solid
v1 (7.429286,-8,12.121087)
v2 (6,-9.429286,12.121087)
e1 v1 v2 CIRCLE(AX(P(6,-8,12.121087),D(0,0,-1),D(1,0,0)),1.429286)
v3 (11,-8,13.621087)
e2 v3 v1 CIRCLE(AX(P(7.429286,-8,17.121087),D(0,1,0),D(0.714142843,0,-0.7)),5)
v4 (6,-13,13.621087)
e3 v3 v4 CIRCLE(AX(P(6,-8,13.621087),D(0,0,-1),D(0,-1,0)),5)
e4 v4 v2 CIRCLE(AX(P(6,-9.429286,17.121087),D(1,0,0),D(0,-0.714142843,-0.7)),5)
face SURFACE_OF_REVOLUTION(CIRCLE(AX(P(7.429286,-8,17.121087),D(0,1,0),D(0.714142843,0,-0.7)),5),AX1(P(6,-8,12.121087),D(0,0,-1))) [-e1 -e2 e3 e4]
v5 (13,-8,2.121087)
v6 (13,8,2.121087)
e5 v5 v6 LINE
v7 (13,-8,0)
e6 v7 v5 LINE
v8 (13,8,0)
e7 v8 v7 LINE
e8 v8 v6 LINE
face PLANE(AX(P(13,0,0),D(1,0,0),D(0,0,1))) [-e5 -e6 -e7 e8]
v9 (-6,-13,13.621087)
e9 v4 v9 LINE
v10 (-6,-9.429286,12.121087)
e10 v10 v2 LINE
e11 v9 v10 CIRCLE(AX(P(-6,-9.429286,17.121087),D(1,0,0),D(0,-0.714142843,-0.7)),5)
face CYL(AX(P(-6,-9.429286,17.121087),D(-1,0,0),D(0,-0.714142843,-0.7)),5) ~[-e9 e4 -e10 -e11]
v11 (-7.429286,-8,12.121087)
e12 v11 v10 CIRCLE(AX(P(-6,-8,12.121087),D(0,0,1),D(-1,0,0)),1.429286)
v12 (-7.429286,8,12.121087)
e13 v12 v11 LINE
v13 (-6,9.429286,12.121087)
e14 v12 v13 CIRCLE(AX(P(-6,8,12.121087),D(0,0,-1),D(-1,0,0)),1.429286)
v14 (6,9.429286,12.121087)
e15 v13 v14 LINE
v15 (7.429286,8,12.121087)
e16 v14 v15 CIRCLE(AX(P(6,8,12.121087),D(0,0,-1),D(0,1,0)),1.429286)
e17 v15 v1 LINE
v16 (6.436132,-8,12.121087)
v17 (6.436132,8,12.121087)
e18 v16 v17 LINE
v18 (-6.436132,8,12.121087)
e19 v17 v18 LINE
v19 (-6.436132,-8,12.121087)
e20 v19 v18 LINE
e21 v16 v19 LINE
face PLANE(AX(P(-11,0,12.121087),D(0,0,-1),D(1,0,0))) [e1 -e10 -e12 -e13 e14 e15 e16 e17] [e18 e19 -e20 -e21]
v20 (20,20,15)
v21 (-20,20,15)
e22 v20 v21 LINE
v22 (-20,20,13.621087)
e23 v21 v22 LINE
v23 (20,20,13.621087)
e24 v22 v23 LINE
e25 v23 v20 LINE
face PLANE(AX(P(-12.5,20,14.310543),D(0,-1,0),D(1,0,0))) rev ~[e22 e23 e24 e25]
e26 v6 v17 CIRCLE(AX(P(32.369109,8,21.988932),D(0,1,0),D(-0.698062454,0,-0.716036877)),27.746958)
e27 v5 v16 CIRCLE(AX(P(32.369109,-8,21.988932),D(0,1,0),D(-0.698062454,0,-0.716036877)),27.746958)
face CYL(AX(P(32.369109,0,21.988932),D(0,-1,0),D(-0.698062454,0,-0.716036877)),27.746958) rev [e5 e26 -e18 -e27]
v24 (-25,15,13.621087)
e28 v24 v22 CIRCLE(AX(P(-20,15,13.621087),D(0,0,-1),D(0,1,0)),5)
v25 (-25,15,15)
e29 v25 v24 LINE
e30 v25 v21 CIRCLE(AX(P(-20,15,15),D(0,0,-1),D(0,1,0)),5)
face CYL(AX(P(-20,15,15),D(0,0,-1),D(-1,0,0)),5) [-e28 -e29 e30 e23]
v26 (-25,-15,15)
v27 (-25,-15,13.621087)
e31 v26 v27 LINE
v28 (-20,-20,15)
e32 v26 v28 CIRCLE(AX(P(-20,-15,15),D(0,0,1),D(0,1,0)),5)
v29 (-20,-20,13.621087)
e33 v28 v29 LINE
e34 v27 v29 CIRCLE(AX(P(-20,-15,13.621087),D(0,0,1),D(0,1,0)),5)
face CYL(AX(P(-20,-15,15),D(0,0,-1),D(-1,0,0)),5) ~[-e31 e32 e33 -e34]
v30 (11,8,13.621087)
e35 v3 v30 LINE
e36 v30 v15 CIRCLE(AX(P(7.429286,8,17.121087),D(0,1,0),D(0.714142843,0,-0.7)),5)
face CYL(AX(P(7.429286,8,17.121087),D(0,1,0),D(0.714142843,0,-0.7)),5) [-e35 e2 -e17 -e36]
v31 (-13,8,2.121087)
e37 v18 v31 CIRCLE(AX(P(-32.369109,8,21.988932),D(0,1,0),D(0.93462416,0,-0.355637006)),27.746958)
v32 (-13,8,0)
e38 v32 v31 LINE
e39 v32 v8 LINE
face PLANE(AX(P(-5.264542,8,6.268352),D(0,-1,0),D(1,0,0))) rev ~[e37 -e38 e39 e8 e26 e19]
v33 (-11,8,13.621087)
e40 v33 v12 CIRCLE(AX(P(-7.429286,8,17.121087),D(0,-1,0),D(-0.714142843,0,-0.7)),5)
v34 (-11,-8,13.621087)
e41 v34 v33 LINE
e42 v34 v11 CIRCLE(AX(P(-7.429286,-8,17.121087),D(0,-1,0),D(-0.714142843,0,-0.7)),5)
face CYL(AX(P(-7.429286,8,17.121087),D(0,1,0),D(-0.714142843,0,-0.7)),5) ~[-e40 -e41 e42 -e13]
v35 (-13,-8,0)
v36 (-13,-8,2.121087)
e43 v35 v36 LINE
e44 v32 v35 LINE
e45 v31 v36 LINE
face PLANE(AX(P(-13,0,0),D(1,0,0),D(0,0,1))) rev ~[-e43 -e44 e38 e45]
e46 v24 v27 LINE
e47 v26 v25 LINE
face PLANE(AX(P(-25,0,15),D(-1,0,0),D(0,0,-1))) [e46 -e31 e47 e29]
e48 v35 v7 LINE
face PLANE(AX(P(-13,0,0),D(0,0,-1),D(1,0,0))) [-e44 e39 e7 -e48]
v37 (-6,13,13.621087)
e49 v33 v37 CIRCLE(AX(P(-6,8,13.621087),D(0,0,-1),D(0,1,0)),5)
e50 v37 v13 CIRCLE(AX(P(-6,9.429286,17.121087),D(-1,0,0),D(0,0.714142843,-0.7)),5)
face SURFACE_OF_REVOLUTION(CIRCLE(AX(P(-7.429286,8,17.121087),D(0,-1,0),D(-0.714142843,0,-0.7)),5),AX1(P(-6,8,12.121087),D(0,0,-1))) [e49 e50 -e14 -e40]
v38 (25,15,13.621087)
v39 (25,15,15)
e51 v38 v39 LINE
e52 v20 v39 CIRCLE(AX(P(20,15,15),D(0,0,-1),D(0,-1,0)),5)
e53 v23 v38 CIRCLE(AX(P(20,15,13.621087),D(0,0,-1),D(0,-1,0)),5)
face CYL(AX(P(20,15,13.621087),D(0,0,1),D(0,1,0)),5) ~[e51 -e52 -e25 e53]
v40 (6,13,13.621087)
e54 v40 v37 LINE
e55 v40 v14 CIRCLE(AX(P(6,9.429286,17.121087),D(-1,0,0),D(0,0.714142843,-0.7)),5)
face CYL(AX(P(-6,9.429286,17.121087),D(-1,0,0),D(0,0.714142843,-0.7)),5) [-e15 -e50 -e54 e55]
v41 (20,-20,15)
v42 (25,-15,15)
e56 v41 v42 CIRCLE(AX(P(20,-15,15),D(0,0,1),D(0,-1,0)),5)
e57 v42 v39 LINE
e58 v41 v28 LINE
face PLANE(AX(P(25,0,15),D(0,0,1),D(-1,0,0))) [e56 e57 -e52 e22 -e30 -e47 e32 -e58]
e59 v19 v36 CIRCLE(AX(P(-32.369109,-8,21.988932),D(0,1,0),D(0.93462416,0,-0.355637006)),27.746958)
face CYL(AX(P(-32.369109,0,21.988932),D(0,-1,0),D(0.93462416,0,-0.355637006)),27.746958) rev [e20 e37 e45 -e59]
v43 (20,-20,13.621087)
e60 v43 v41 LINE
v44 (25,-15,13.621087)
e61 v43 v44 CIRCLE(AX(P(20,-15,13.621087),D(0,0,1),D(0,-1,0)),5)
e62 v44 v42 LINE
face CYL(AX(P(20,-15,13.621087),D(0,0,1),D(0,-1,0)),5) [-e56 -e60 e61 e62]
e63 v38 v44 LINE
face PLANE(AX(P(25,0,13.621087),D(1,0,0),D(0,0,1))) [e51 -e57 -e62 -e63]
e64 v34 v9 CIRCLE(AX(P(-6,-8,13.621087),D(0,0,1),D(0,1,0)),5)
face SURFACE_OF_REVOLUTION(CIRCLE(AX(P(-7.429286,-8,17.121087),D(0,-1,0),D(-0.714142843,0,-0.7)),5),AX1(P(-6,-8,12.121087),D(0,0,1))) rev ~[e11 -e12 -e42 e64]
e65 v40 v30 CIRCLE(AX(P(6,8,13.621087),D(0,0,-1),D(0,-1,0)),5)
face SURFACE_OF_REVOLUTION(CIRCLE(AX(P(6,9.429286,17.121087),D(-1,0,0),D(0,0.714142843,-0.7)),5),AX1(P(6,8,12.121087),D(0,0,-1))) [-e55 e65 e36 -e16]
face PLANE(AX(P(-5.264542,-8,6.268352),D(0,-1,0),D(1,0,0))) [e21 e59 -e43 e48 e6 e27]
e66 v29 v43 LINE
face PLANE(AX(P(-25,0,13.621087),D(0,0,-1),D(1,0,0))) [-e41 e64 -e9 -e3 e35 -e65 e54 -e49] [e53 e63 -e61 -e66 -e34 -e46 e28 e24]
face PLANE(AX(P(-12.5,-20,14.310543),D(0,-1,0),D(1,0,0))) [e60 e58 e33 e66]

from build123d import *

# Parameters (mm, degrees)
F1_DEPTH     = 20
F2_DEPTH     = 13
F0_W         = 13
F0_H         = 2.1210866805
F3_R         = 5
F4_R         = 5
F6_DEPTH     = 8
F7_R         = 5
F8_T1_DEPTH  = 12
F8_T3_DEPTH  = 16
F8_T6_ANGLE  = 90
F8_T8_ANGLE  = 90
F8_T10_ANGLE = 90
F8_T12_ANGLE = 90


# Not quite as in the source:
# - a fillet or chamfer that OpenCascade refuses, or shapes differently, is made with other operations: its cross-section is extruded or revolved along the edge and cut away or added


with BuildPart() as f1:
    # F0 (on Front) → F1 (new body, symmetric)
    with BuildSketch(Plane.XZ):
        Polygon((0, 13.6210866805), (0, 15), (-25, 15), (-25, 13.6210866805), (-11, 13.6210866805), align=None)
        Polygon((25, 15), (0, 15), (0, 13.6210866805), (11, 13.6210866805), (25, 13.6210866805), align=None)
    extrude(amount=F1_DEPTH, both=True)

    # F0 (on Front) → F2 (join, symmetric)
    with BuildSketch(Plane.XZ):
        Polygon((0, 12.1210866805), (0, 13.6210866805), (-11, 13.6210866805), (-11, 12.1210866805), (-6.4361323602, 12.1210866805), align=None)
        Polygon((11, 13.6210866805), (0, 13.6210866805), (0, 12.1210866805), (6.4361323602, 12.1210866805), (11, 12.1210866805), align=None)
    extrude(amount=F2_DEPTH, both=True)

    # F4
    f4_edges = [f1.edges().sort_by_distance(p)[0] for p in [
        (-25, -20, 14.310543),
        (-25, 20, 14.310543),
        (25, -20, 14.310543),
        (25, 20, 14.310543),
    ]]
    fillet(f4_edges, radius=F4_R)

    # F0 (on Front) → F6 (join, symmetric)
    with BuildSketch(Plane.XZ):
        with BuildLine():
            Line((0, 2.1210866805), (0, 12.1210866805))
            Line((0, 12.1210866805), (-6.4361323602, 12.1210866805))
            ThreePointArc((-6.4361323602, 12.1210866805), (-9.1727786789, 6.7631671822), (-13, 2.1210866805))
            Line((-13, 2.1210866805), (0, 2.1210866805))
        make_face()
        with Locations((-6.5, 1.0605433403)):
            Rectangle(F0_W, F0_H)
        with BuildLine():
            Line((6.4361323602, 12.1210866805), (0, 12.1210866805))
            Line((0, 12.1210866805), (0, 2.1210866805))
            Line((0, 2.1210866805), (13, 2.1210866805))
            ThreePointArc((13, 2.1210866805), (9.1727786789, 6.7631671822), (6.4361323602, 12.1210866805))
        make_face()
        with Locations((6.5, 1.0605433403)):
            Rectangle(F0_W, F0_H)
    extrude(amount=F6_DEPTH, both=True)

    # F7
    f7_edges = [f1.edges().sort_by_distance(p)[0] for p in [
        (-11, -13, 12.871087),
        (-11, 13, 12.871087),
        (11, -13, 12.871087),
        (11, 13, 12.871087),
    ]]
    fillet(f7_edges, radius=F7_R)

    # F8: fillet of radius 5 on 1 edges, made by hand

    # F8_s2 → F8_t1 (cut)
    with BuildSketch(Plane.YZ.offset(-6)):
        with BuildLine():
            ThreePointArc((-13, 13.6210866805), (-11.3657774588, 12.5113144519), (-9.4292857857, 12.1210866805))
            Line((-9.4292857857, 12.1210866805), (-9.4292857857, 12.0210866805))
            Line((-9.4292857857, 12.0210866805), (-13, 12.0210866805))
            Line((-13, 12.0210866805), (-13.1, 12.1210866805))
            ThreePointArc((-13.1, 12.1210866805), (-13.1, 12.8710866805), (-13.0714142843, 13.5510866805))
            Line((-13.0714142843, 13.5510866805), (-13, 13.6210866805))
        make_face()
        with BuildLine():
            ThreePointArc((13, 13.6210866805), (11.3657774588, 12.5113144519), (9.4292857857, 12.1210866805))
            Line((9.4292857857, 12.1210866805), (9.4292857857, 12.0210866805))
            Line((9.4292857857, 12.0210866805), (13, 12.0210866805))
            Line((13, 12.0210866805), (13.1, 12.1210866805))
            ThreePointArc((13.1, 12.1210866805), (13.1, 12.8710866805), (13.0714142843, 13.5510866805))
            Line((13.0714142843, 13.5510866805), (13, 13.6210866805))
        make_face()
    extrude(amount=F8_T1_DEPTH, mode=Mode.SUBTRACT)

    # F8_s4 → F8_t3 (cut)
    with BuildSketch(Plane.XZ.offset(-8)):
        with BuildLine():
            ThreePointArc((11, 13.6210866805), (9.3657774588, 12.5113144519), (7.4292857857, 12.1210866805))
            Line((7.4292857857, 12.1210866805), (7.4292857857, 12.0210866805))
            Line((7.4292857857, 12.0210866805), (11, 12.0210866805))
            Line((11, 12.0210866805), (11.1, 12.1210866805))
            ThreePointArc((11.1, 12.1210866805), (11.1, 12.8710866805), (11.0714142843, 13.5510866805))
            Line((11.0714142843, 13.5510866805), (11, 13.6210866805))
        make_face()
        with BuildLine():
            ThreePointArc((-11, 13.6210866805), (-9.3657774588, 12.5113144519), (-7.4292857857, 12.1210866805))
            Line((-7.4292857857, 12.1210866805), (-7.4292857857, 12.0210866805))
            Line((-7.4292857857, 12.0210866805), (-11, 12.0210866805))
            Line((-11, 12.0210866805), (-11.1, 12.1210866805))
            ThreePointArc((-11.1, 12.1210866805), (-11.1, 12.8710866805), (-11.0714142843, 13.5510866805))
            Line((-11.0714142843, 13.5510866805), (-11, 13.6210866805))
        make_face()
    extrude(amount=F8_T3_DEPTH, mode=Mode.SUBTRACT)

    # F8_s5 → F8_t6 (revolve, cut)
    with BuildSketch(Plane.XZ.offset(8)):
        with BuildLine():
            ThreePointArc((-11, 13.6210866805), (-9.3657774588, 12.5113144519), (-7.4292857857, 12.1210866805))
            Line((-7.4292857857, 12.1210866805), (-7.4292857857, 12.0210866805))
            Line((-7.4292857857, 12.0210866805), (-11, 12.0210866805))
            Line((-11, 12.0210866805), (-11.1, 12.1210866805))
            ThreePointArc((-11.1, 12.1210866805), (-11.1, 12.8710866805), (-11.0714142843, 13.5510866805))
            Line((-11.0714142843, 13.5510866805), (-11, 13.6210866805))
        make_face()
    revolve(axis=Axis((-6, -8, 12.1210866805), (0, 0, 1)), revolution_arc=F8_T6_ANGLE, mode=Mode.SUBTRACT)

    # F8_s7 → F8_t8 (revolve, cut)
    with BuildSketch(Plane.XZ.offset(8)):
        with BuildLine():
            ThreePointArc((11, 13.6210866805), (9.3657774588, 12.5113144519), (7.4292857857, 12.1210866805))
            Line((7.4292857857, 12.1210866805), (7.4292857857, 12.0210866805))
            Line((7.4292857857, 12.0210866805), (11, 12.0210866805))
            Line((11, 12.0210866805), (11.1, 12.1210866805))
            ThreePointArc((11.1, 12.1210866805), (11.1, 12.8710866805), (11.0714142843, 13.5510866805))
            Line((11.0714142843, 13.5510866805), (11, 13.6210866805))
        make_face()
    revolve(axis=Axis((6, -8, 12.1210866805), (0, 0, -1)), revolution_arc=F8_T8_ANGLE, mode=Mode.SUBTRACT)

    # F8_s9 → F8_t10 (revolve, cut)
    with BuildSketch(Plane.YZ.offset(6)):
        with BuildLine():
            ThreePointArc((13, 13.6210866805), (11.3657774588, 12.5113144519), (9.4292857857, 12.1210866805))
            Line((9.4292857857, 12.1210866805), (9.4292857857, 12.0210866805))
            Line((9.4292857857, 12.0210866805), (13, 12.0210866805))
            Line((13, 12.0210866805), (13.1, 12.1210866805))
            ThreePointArc((13.1, 12.1210866805), (13.1, 12.8710866805), (13.0714142843, 13.5510866805))
            Line((13.0714142843, 13.5510866805), (13, 13.6210866805))
        make_face()
    revolve(axis=Axis((6, 8, 12.1210866805), (0, 0, -1)), revolution_arc=F8_T10_ANGLE, mode=Mode.SUBTRACT)

    # F8_s11 → F8_t12 (revolve, cut)
    with BuildSketch(Plane.XZ.offset(-8)):
        with BuildLine():
            ThreePointArc((-11, 13.6210866805), (-9.3657774588, 12.5113144519), (-7.4292857857, 12.1210866805))
            Line((-7.4292857857, 12.1210866805), (-7.4292857857, 12.0210866805))
            Line((-7.4292857857, 12.0210866805), (-11, 12.0210866805))
            Line((-11, 12.0210866805), (-11.1, 12.1210866805))
            ThreePointArc((-11.1, 12.1210866805), (-11.1, 12.8710866805), (-11.0714142843, 13.5510866805))
            Line((-11.0714142843, 13.5510866805), (-11, 13.6210866805))
        make_face()
    revolve(axis=Axis((-6, 8, 12.1210866805), (0, 0, -1)), revolution_arc=F8_T12_ANGLE, mode=Mode.SUBTRACT)


with BuildPart() as f2:
    # F0 (on Front) → F2, piece 2 (new body, symmetric)
    with BuildSketch(Plane.XZ):
        with Locations((-6.5, 1.0605433403)):
            Rectangle(F0_W, F0_H)
        with Locations((6.5, 1.0605433403)):
            Rectangle(F0_W, F0_H)
    extrude(amount=F2_DEPTH, both=True)

    # F3
    f3_edges = [f2.edges().sort_by_distance(p)[0] for p in [
        (-13, 13, 1.060543),
        (-13, -13, 1.060543),
        (13, -13, 1.060543),
        (13, 13, 1.060543),
    ]]
    fillet(f3_edges, radius=F3_R)


solid = f1.part
